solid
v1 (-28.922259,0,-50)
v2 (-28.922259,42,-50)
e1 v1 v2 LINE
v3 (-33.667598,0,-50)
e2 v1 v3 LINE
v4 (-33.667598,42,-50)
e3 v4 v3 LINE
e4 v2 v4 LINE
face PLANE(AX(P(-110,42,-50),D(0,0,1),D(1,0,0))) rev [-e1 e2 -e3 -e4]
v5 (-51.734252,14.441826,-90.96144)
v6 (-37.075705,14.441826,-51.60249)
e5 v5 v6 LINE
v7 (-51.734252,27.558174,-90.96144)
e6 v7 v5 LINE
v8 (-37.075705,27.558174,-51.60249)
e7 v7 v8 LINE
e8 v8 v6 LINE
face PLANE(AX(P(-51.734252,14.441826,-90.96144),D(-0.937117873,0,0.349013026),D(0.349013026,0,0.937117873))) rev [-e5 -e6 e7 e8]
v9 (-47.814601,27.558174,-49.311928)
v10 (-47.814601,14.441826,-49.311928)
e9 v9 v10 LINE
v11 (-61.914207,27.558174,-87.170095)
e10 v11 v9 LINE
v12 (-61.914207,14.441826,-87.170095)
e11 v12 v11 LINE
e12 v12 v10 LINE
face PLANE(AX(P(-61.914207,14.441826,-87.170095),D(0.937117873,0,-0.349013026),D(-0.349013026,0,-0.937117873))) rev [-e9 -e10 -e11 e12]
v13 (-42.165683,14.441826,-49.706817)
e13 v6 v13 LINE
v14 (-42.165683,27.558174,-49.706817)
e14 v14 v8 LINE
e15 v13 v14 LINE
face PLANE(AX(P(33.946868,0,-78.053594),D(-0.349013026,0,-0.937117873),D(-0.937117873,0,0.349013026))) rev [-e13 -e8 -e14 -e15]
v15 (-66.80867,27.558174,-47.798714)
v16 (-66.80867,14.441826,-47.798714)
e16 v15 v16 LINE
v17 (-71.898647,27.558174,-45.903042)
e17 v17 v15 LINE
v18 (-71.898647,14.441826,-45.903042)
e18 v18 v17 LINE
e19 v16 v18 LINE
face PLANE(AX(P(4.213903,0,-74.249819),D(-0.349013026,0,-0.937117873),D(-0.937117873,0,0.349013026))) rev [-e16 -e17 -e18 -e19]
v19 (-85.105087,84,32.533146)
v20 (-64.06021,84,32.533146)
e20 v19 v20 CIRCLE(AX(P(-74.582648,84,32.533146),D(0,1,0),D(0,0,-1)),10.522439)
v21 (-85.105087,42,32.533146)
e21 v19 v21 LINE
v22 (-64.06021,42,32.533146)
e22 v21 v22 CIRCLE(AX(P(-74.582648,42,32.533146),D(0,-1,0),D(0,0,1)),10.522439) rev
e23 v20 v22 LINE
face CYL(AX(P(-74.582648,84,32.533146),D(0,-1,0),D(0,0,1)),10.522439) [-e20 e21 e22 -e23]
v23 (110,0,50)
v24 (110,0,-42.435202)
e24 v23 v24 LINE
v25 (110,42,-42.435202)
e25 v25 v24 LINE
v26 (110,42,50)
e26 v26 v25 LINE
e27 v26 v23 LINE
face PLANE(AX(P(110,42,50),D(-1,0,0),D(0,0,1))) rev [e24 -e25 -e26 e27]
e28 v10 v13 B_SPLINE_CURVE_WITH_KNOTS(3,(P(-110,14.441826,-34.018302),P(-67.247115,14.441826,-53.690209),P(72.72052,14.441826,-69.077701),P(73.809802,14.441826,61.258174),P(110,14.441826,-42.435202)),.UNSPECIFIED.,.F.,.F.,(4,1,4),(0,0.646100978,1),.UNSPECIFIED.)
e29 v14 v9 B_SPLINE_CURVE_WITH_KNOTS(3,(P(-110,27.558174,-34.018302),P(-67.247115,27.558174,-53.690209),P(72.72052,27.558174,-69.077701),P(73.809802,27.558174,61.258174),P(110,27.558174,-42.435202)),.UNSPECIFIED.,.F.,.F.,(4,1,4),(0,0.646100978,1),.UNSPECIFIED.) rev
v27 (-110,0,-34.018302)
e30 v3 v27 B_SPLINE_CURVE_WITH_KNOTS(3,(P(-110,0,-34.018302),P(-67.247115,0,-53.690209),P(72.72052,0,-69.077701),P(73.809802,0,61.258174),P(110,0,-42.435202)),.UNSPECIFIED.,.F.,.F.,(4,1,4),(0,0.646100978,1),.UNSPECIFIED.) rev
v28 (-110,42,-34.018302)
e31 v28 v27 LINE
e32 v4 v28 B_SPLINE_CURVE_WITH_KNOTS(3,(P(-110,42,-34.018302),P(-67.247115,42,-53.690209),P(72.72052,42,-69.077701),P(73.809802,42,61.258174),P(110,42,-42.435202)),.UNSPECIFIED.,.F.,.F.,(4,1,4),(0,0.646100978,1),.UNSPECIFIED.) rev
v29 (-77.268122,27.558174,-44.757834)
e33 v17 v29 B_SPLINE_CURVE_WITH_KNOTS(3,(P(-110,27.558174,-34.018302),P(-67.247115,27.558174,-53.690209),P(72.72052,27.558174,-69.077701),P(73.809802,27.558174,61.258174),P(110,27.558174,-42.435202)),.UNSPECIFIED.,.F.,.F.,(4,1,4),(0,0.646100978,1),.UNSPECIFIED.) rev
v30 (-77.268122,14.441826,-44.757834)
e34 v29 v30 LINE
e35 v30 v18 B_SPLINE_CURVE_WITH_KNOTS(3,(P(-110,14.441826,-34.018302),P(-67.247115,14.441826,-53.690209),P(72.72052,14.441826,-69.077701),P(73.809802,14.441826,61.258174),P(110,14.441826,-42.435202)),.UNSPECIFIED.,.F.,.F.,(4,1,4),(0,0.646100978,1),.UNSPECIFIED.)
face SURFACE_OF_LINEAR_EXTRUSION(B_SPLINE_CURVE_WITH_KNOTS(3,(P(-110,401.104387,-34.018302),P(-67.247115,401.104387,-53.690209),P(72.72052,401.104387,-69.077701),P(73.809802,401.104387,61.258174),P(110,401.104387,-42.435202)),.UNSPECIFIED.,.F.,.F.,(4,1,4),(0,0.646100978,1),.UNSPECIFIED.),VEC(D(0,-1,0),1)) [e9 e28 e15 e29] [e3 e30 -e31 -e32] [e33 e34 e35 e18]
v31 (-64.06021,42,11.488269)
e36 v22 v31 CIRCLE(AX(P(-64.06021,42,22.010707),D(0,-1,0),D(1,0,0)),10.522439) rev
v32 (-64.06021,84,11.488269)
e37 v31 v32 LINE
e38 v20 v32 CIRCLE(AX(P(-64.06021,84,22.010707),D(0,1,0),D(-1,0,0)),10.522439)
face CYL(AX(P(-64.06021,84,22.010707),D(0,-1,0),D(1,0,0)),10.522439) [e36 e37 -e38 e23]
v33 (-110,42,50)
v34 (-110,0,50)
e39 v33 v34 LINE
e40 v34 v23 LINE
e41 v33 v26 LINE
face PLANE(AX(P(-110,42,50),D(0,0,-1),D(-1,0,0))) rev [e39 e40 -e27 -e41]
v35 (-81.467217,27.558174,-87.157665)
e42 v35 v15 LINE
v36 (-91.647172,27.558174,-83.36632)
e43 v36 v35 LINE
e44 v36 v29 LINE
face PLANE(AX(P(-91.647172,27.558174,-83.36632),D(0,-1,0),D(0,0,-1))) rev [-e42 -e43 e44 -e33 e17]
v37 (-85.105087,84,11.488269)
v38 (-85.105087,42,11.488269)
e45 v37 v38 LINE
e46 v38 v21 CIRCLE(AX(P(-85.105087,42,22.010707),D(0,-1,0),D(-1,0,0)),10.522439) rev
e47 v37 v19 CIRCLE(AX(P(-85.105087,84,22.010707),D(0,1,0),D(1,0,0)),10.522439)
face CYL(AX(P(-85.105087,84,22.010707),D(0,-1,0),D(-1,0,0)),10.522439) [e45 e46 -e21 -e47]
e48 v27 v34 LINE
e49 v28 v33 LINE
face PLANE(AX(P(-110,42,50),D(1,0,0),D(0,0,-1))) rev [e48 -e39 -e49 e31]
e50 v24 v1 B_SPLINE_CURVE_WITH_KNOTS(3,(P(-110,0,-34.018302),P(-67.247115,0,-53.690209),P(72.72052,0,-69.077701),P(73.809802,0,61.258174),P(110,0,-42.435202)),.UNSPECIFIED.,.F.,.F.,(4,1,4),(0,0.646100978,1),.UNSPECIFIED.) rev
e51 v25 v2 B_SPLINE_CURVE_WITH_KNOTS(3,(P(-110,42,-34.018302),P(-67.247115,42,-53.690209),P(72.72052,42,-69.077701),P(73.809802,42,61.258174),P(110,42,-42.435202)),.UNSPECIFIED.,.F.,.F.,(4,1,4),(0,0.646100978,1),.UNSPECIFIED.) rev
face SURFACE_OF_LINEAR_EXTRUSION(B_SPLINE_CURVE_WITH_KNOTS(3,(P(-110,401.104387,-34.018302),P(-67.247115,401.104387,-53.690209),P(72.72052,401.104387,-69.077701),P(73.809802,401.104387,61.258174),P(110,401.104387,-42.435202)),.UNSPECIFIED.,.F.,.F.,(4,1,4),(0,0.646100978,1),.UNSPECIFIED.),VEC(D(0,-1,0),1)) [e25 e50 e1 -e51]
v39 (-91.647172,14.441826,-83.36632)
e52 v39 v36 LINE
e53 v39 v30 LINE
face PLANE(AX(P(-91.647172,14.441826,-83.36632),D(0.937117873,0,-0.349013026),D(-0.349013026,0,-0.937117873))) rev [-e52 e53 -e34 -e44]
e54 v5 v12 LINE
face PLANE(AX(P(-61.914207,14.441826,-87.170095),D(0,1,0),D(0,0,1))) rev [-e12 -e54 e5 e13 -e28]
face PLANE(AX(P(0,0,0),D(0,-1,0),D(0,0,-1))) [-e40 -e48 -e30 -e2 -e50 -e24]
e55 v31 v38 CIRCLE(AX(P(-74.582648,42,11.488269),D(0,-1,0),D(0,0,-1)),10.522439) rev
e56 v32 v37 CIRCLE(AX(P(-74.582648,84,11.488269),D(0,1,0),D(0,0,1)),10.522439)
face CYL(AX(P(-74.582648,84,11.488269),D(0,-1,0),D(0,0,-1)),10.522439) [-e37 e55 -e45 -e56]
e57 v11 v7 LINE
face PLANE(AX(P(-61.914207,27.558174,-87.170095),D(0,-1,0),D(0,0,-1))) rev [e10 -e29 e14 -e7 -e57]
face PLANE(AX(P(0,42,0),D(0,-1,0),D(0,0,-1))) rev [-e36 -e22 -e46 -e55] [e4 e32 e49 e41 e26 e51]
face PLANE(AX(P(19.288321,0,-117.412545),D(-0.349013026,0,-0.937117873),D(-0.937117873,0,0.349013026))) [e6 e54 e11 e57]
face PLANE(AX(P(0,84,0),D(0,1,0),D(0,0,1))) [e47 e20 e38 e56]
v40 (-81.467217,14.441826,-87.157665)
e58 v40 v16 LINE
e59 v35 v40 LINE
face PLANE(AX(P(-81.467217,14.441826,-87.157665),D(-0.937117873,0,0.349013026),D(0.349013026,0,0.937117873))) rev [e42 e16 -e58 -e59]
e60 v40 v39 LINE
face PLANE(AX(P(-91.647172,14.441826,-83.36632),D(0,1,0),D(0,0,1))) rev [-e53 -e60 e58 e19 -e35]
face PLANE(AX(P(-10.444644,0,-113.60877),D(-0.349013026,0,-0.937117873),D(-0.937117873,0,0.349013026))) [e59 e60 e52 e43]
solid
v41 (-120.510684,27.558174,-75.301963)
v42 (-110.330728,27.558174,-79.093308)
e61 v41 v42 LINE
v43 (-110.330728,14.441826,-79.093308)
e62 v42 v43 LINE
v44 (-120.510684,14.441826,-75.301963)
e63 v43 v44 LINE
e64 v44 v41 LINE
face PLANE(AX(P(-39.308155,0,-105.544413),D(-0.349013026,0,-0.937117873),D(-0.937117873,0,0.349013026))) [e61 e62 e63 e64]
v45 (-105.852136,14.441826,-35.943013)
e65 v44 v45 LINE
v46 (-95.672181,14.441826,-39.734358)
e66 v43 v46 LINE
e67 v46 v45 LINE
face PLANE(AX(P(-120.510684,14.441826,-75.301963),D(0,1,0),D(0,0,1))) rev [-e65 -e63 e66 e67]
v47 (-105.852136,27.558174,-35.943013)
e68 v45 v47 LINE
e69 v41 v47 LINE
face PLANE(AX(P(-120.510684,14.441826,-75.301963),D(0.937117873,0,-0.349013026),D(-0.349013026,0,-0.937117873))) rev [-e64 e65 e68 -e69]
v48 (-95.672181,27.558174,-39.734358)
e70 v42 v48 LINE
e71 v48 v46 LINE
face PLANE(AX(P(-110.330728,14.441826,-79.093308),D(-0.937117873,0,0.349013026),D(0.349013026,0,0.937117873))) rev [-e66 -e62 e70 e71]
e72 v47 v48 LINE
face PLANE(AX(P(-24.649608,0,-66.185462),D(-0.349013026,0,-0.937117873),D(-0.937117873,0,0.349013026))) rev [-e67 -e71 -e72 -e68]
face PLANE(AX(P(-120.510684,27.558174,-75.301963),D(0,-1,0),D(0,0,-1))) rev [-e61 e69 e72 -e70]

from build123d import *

# Parameters (mm, degrees)
SKETCH1_W               = 220
SKETCH1_H               = 100
BOSS_EXTRUDE1_DEPTH     = 42
CUT_EXTRUDE1_DEPTH      = 128.921851144
CUT_EXTRUDE1_DEPTH_BACK = 42
SKETCH4_W               = 10.863046684
SKETCH4_H               = 13.116347432
BOSS_EXTRUDE2_DEPTH     = 42
CRVPATTERN4_START       = 14.441826284
CRVPATTERN4_DEPTH       = 13.116347432
SKETCH5_R               = 10.522438617
BOSS_EXTRUDE3_DEPTH     = 42
CRVPATTERN5_START       = 42
CRVPATTERN5_DEPTH       = 42


# Read off the part's stored shape, not the designer's step: CrvPattern4, CrvPattern5
with BuildPart() as part:
    # Sketch1 → Boss-Extrude1 (new body)
    with BuildSketch(Plane(origin=(0, 0, 0), x_dir=(1, 0, 0), z_dir=(0, 1, 0))):
        Rectangle(SKETCH1_W, SKETCH1_H)
    extrude(amount=BOSS_EXTRUDE1_DEPTH)

    # Sketch2 → Cut-Extrude1 (cut, two sides: drawn at the far end of the back side and taken through both)
    with BuildSketch(Plane(origin=(0, 42, 0), x_dir=(1, 0, 0), z_dir=(0, 1, 0)).offset(-CUT_EXTRUDE1_DEPTH_BACK)):
        with BuildLine():
            Line((-110, 50), (-110, 34.018302373))
            add(Edge.make_bspline(
                [(-110, 34.018302373), (-90.921302279, 42.796993449), (-62.347364364, 49.638009449), (-33.667598225, 50)],
                knots=[0, 0, 0, 0, 0.288325929, 0.288325929, 0.288325929, 0.288325929], degree=3))
            Line((-33.667598225, 50), (-110, 50))
        make_face()
        with BuildLine():
            Line((110, 50), (-28.922259265, 50))
            add(Edge.make_bspline(
                [(-28.922259265, 50), (5.063593541, 49.565322922), (73.051912414, 29.42561028), (73.809802477, -61.258173527), (110, 42.435201929)],
                knots=[0.304230058, 0.304230058, 0.304230058, 0.304230058, 0.646100978, 1, 1, 1, 1], degree=3))
            Line((110, 42.435201929), (110, 50))
        make_face()
    extrude(amount=CUT_EXTRUDE1_DEPTH + CUT_EXTRUDE1_DEPTH_BACK, mode=Mode.SUBTRACT)

    # CrvPattern4 outline → CrvPattern4 (add)
    with BuildSketch(Plane(origin=(0, 0, 0), x_dir=(1, 0, 0), z_dir=(0, 1, 0)).offset(CRVPATTERN4_START)):
        with BuildLine():
            Line((-61.914207467, 87.170095465), (-47.814600775, 49.311928392))
            add(Edge.make_bspline(
                [(-47.814600775, 49.311928392), (-45.937957006, 49.469032429), (-44.054080269, 49.601099301), (-42.165682791, 49.706817193)],
                knots=[0.240747613, 0.240747613, 0.240747613, 0.240747613, 0.259807176, 0.259807176, 0.259807176, 0.259807176], degree=3))
            Line((-42.165682791, 49.706817193), (-37.07570519, 51.602489588))
            Line((-37.07570519, 51.602489588), (-51.734252265, 90.961440256))
            Line((-51.734252265, 90.961440256), (-61.914207467, 87.170095465))
        make_face()
        with BuildLine():
            Line((-66.80866968, 47.79871448), (-81.467216756, 87.157665147))
            Line((-81.467216756, 87.157665147), (-91.647171958, 83.366320357))
            Line((-91.647171958, 83.366320357), (-77.268122044, 44.7578339))
            add(Edge.make_bspline(
                [(-77.268122044, 44.7578339), (-75.500522799, 45.159009867), (-73.709714059, 45.54122177), (-71.898647282, 45.903042085)],
                knots=[0.137413099, 0.137413099, 0.137413099, 0.137413099, 0.157017326, 0.157017326, 0.157017326, 0.157017326], degree=3))
            Line((-71.898647282, 45.903042085), (-66.80866968, 47.79871448))
        make_face()
    extrude(amount=CRVPATTERN4_DEPTH)

    # Sketch5 → Boss-Extrude3 (add)
    with BuildSketch(Plane(origin=(0, 42, 0), x_dir=(1, 0, 0), z_dir=(0, 1, 0))):
        with Locations(Location((-74.582648438, -11.488268504, 0), (0, 0, 90))):
            Circle(SKETCH5_R)
    extrude(amount=BOSS_EXTRUDE3_DEPTH)

    # CrvPattern5 outline → CrvPattern5 (add)
    with BuildSketch(Plane(origin=(0, 0, 0), x_dir=(1, 0, 0), z_dir=(0, 1, 0)).offset(CRVPATTERN5_START)):
        with BuildLine():
            ThreePointArc((-85.105087055, -11.488268504), (-95.627525672, -22.010707121), (-85.105087055, -32.533145738))
            ThreePointArc((-85.105087055, -32.533145738), (-74.582648438, -43.055584355), (-64.060209821, -32.533145738))
            ThreePointArc((-64.060209821, -32.533145738), (-53.537771204, -22.010707121), (-64.060209821, -11.488268504))
            ThreePointArc((-64.060209821, -11.488268504), (-74.582648438, -22.010707121), (-85.105087055, -11.488268504))
        make_face()
    extrude(amount=CRVPATTERN5_DEPTH)


with BuildPart() as body_2:
    # Sketch4 → Boss-Extrude2 (new body)
    with BuildSketch(Plane(origin=(-100.762158874, 21, -37.838685151), x_dir=(-0.9371178730352806, 0, 0.3490130255990909), z_dir=(-0.3490130255990909, 0, -0.9371178730352806))):
        Rectangle(SKETCH4_W, SKETCH4_H)
    extrude(amount=BOSS_EXTRUDE2_DEPTH)


solid = Compound([part.part, body_2.part])
